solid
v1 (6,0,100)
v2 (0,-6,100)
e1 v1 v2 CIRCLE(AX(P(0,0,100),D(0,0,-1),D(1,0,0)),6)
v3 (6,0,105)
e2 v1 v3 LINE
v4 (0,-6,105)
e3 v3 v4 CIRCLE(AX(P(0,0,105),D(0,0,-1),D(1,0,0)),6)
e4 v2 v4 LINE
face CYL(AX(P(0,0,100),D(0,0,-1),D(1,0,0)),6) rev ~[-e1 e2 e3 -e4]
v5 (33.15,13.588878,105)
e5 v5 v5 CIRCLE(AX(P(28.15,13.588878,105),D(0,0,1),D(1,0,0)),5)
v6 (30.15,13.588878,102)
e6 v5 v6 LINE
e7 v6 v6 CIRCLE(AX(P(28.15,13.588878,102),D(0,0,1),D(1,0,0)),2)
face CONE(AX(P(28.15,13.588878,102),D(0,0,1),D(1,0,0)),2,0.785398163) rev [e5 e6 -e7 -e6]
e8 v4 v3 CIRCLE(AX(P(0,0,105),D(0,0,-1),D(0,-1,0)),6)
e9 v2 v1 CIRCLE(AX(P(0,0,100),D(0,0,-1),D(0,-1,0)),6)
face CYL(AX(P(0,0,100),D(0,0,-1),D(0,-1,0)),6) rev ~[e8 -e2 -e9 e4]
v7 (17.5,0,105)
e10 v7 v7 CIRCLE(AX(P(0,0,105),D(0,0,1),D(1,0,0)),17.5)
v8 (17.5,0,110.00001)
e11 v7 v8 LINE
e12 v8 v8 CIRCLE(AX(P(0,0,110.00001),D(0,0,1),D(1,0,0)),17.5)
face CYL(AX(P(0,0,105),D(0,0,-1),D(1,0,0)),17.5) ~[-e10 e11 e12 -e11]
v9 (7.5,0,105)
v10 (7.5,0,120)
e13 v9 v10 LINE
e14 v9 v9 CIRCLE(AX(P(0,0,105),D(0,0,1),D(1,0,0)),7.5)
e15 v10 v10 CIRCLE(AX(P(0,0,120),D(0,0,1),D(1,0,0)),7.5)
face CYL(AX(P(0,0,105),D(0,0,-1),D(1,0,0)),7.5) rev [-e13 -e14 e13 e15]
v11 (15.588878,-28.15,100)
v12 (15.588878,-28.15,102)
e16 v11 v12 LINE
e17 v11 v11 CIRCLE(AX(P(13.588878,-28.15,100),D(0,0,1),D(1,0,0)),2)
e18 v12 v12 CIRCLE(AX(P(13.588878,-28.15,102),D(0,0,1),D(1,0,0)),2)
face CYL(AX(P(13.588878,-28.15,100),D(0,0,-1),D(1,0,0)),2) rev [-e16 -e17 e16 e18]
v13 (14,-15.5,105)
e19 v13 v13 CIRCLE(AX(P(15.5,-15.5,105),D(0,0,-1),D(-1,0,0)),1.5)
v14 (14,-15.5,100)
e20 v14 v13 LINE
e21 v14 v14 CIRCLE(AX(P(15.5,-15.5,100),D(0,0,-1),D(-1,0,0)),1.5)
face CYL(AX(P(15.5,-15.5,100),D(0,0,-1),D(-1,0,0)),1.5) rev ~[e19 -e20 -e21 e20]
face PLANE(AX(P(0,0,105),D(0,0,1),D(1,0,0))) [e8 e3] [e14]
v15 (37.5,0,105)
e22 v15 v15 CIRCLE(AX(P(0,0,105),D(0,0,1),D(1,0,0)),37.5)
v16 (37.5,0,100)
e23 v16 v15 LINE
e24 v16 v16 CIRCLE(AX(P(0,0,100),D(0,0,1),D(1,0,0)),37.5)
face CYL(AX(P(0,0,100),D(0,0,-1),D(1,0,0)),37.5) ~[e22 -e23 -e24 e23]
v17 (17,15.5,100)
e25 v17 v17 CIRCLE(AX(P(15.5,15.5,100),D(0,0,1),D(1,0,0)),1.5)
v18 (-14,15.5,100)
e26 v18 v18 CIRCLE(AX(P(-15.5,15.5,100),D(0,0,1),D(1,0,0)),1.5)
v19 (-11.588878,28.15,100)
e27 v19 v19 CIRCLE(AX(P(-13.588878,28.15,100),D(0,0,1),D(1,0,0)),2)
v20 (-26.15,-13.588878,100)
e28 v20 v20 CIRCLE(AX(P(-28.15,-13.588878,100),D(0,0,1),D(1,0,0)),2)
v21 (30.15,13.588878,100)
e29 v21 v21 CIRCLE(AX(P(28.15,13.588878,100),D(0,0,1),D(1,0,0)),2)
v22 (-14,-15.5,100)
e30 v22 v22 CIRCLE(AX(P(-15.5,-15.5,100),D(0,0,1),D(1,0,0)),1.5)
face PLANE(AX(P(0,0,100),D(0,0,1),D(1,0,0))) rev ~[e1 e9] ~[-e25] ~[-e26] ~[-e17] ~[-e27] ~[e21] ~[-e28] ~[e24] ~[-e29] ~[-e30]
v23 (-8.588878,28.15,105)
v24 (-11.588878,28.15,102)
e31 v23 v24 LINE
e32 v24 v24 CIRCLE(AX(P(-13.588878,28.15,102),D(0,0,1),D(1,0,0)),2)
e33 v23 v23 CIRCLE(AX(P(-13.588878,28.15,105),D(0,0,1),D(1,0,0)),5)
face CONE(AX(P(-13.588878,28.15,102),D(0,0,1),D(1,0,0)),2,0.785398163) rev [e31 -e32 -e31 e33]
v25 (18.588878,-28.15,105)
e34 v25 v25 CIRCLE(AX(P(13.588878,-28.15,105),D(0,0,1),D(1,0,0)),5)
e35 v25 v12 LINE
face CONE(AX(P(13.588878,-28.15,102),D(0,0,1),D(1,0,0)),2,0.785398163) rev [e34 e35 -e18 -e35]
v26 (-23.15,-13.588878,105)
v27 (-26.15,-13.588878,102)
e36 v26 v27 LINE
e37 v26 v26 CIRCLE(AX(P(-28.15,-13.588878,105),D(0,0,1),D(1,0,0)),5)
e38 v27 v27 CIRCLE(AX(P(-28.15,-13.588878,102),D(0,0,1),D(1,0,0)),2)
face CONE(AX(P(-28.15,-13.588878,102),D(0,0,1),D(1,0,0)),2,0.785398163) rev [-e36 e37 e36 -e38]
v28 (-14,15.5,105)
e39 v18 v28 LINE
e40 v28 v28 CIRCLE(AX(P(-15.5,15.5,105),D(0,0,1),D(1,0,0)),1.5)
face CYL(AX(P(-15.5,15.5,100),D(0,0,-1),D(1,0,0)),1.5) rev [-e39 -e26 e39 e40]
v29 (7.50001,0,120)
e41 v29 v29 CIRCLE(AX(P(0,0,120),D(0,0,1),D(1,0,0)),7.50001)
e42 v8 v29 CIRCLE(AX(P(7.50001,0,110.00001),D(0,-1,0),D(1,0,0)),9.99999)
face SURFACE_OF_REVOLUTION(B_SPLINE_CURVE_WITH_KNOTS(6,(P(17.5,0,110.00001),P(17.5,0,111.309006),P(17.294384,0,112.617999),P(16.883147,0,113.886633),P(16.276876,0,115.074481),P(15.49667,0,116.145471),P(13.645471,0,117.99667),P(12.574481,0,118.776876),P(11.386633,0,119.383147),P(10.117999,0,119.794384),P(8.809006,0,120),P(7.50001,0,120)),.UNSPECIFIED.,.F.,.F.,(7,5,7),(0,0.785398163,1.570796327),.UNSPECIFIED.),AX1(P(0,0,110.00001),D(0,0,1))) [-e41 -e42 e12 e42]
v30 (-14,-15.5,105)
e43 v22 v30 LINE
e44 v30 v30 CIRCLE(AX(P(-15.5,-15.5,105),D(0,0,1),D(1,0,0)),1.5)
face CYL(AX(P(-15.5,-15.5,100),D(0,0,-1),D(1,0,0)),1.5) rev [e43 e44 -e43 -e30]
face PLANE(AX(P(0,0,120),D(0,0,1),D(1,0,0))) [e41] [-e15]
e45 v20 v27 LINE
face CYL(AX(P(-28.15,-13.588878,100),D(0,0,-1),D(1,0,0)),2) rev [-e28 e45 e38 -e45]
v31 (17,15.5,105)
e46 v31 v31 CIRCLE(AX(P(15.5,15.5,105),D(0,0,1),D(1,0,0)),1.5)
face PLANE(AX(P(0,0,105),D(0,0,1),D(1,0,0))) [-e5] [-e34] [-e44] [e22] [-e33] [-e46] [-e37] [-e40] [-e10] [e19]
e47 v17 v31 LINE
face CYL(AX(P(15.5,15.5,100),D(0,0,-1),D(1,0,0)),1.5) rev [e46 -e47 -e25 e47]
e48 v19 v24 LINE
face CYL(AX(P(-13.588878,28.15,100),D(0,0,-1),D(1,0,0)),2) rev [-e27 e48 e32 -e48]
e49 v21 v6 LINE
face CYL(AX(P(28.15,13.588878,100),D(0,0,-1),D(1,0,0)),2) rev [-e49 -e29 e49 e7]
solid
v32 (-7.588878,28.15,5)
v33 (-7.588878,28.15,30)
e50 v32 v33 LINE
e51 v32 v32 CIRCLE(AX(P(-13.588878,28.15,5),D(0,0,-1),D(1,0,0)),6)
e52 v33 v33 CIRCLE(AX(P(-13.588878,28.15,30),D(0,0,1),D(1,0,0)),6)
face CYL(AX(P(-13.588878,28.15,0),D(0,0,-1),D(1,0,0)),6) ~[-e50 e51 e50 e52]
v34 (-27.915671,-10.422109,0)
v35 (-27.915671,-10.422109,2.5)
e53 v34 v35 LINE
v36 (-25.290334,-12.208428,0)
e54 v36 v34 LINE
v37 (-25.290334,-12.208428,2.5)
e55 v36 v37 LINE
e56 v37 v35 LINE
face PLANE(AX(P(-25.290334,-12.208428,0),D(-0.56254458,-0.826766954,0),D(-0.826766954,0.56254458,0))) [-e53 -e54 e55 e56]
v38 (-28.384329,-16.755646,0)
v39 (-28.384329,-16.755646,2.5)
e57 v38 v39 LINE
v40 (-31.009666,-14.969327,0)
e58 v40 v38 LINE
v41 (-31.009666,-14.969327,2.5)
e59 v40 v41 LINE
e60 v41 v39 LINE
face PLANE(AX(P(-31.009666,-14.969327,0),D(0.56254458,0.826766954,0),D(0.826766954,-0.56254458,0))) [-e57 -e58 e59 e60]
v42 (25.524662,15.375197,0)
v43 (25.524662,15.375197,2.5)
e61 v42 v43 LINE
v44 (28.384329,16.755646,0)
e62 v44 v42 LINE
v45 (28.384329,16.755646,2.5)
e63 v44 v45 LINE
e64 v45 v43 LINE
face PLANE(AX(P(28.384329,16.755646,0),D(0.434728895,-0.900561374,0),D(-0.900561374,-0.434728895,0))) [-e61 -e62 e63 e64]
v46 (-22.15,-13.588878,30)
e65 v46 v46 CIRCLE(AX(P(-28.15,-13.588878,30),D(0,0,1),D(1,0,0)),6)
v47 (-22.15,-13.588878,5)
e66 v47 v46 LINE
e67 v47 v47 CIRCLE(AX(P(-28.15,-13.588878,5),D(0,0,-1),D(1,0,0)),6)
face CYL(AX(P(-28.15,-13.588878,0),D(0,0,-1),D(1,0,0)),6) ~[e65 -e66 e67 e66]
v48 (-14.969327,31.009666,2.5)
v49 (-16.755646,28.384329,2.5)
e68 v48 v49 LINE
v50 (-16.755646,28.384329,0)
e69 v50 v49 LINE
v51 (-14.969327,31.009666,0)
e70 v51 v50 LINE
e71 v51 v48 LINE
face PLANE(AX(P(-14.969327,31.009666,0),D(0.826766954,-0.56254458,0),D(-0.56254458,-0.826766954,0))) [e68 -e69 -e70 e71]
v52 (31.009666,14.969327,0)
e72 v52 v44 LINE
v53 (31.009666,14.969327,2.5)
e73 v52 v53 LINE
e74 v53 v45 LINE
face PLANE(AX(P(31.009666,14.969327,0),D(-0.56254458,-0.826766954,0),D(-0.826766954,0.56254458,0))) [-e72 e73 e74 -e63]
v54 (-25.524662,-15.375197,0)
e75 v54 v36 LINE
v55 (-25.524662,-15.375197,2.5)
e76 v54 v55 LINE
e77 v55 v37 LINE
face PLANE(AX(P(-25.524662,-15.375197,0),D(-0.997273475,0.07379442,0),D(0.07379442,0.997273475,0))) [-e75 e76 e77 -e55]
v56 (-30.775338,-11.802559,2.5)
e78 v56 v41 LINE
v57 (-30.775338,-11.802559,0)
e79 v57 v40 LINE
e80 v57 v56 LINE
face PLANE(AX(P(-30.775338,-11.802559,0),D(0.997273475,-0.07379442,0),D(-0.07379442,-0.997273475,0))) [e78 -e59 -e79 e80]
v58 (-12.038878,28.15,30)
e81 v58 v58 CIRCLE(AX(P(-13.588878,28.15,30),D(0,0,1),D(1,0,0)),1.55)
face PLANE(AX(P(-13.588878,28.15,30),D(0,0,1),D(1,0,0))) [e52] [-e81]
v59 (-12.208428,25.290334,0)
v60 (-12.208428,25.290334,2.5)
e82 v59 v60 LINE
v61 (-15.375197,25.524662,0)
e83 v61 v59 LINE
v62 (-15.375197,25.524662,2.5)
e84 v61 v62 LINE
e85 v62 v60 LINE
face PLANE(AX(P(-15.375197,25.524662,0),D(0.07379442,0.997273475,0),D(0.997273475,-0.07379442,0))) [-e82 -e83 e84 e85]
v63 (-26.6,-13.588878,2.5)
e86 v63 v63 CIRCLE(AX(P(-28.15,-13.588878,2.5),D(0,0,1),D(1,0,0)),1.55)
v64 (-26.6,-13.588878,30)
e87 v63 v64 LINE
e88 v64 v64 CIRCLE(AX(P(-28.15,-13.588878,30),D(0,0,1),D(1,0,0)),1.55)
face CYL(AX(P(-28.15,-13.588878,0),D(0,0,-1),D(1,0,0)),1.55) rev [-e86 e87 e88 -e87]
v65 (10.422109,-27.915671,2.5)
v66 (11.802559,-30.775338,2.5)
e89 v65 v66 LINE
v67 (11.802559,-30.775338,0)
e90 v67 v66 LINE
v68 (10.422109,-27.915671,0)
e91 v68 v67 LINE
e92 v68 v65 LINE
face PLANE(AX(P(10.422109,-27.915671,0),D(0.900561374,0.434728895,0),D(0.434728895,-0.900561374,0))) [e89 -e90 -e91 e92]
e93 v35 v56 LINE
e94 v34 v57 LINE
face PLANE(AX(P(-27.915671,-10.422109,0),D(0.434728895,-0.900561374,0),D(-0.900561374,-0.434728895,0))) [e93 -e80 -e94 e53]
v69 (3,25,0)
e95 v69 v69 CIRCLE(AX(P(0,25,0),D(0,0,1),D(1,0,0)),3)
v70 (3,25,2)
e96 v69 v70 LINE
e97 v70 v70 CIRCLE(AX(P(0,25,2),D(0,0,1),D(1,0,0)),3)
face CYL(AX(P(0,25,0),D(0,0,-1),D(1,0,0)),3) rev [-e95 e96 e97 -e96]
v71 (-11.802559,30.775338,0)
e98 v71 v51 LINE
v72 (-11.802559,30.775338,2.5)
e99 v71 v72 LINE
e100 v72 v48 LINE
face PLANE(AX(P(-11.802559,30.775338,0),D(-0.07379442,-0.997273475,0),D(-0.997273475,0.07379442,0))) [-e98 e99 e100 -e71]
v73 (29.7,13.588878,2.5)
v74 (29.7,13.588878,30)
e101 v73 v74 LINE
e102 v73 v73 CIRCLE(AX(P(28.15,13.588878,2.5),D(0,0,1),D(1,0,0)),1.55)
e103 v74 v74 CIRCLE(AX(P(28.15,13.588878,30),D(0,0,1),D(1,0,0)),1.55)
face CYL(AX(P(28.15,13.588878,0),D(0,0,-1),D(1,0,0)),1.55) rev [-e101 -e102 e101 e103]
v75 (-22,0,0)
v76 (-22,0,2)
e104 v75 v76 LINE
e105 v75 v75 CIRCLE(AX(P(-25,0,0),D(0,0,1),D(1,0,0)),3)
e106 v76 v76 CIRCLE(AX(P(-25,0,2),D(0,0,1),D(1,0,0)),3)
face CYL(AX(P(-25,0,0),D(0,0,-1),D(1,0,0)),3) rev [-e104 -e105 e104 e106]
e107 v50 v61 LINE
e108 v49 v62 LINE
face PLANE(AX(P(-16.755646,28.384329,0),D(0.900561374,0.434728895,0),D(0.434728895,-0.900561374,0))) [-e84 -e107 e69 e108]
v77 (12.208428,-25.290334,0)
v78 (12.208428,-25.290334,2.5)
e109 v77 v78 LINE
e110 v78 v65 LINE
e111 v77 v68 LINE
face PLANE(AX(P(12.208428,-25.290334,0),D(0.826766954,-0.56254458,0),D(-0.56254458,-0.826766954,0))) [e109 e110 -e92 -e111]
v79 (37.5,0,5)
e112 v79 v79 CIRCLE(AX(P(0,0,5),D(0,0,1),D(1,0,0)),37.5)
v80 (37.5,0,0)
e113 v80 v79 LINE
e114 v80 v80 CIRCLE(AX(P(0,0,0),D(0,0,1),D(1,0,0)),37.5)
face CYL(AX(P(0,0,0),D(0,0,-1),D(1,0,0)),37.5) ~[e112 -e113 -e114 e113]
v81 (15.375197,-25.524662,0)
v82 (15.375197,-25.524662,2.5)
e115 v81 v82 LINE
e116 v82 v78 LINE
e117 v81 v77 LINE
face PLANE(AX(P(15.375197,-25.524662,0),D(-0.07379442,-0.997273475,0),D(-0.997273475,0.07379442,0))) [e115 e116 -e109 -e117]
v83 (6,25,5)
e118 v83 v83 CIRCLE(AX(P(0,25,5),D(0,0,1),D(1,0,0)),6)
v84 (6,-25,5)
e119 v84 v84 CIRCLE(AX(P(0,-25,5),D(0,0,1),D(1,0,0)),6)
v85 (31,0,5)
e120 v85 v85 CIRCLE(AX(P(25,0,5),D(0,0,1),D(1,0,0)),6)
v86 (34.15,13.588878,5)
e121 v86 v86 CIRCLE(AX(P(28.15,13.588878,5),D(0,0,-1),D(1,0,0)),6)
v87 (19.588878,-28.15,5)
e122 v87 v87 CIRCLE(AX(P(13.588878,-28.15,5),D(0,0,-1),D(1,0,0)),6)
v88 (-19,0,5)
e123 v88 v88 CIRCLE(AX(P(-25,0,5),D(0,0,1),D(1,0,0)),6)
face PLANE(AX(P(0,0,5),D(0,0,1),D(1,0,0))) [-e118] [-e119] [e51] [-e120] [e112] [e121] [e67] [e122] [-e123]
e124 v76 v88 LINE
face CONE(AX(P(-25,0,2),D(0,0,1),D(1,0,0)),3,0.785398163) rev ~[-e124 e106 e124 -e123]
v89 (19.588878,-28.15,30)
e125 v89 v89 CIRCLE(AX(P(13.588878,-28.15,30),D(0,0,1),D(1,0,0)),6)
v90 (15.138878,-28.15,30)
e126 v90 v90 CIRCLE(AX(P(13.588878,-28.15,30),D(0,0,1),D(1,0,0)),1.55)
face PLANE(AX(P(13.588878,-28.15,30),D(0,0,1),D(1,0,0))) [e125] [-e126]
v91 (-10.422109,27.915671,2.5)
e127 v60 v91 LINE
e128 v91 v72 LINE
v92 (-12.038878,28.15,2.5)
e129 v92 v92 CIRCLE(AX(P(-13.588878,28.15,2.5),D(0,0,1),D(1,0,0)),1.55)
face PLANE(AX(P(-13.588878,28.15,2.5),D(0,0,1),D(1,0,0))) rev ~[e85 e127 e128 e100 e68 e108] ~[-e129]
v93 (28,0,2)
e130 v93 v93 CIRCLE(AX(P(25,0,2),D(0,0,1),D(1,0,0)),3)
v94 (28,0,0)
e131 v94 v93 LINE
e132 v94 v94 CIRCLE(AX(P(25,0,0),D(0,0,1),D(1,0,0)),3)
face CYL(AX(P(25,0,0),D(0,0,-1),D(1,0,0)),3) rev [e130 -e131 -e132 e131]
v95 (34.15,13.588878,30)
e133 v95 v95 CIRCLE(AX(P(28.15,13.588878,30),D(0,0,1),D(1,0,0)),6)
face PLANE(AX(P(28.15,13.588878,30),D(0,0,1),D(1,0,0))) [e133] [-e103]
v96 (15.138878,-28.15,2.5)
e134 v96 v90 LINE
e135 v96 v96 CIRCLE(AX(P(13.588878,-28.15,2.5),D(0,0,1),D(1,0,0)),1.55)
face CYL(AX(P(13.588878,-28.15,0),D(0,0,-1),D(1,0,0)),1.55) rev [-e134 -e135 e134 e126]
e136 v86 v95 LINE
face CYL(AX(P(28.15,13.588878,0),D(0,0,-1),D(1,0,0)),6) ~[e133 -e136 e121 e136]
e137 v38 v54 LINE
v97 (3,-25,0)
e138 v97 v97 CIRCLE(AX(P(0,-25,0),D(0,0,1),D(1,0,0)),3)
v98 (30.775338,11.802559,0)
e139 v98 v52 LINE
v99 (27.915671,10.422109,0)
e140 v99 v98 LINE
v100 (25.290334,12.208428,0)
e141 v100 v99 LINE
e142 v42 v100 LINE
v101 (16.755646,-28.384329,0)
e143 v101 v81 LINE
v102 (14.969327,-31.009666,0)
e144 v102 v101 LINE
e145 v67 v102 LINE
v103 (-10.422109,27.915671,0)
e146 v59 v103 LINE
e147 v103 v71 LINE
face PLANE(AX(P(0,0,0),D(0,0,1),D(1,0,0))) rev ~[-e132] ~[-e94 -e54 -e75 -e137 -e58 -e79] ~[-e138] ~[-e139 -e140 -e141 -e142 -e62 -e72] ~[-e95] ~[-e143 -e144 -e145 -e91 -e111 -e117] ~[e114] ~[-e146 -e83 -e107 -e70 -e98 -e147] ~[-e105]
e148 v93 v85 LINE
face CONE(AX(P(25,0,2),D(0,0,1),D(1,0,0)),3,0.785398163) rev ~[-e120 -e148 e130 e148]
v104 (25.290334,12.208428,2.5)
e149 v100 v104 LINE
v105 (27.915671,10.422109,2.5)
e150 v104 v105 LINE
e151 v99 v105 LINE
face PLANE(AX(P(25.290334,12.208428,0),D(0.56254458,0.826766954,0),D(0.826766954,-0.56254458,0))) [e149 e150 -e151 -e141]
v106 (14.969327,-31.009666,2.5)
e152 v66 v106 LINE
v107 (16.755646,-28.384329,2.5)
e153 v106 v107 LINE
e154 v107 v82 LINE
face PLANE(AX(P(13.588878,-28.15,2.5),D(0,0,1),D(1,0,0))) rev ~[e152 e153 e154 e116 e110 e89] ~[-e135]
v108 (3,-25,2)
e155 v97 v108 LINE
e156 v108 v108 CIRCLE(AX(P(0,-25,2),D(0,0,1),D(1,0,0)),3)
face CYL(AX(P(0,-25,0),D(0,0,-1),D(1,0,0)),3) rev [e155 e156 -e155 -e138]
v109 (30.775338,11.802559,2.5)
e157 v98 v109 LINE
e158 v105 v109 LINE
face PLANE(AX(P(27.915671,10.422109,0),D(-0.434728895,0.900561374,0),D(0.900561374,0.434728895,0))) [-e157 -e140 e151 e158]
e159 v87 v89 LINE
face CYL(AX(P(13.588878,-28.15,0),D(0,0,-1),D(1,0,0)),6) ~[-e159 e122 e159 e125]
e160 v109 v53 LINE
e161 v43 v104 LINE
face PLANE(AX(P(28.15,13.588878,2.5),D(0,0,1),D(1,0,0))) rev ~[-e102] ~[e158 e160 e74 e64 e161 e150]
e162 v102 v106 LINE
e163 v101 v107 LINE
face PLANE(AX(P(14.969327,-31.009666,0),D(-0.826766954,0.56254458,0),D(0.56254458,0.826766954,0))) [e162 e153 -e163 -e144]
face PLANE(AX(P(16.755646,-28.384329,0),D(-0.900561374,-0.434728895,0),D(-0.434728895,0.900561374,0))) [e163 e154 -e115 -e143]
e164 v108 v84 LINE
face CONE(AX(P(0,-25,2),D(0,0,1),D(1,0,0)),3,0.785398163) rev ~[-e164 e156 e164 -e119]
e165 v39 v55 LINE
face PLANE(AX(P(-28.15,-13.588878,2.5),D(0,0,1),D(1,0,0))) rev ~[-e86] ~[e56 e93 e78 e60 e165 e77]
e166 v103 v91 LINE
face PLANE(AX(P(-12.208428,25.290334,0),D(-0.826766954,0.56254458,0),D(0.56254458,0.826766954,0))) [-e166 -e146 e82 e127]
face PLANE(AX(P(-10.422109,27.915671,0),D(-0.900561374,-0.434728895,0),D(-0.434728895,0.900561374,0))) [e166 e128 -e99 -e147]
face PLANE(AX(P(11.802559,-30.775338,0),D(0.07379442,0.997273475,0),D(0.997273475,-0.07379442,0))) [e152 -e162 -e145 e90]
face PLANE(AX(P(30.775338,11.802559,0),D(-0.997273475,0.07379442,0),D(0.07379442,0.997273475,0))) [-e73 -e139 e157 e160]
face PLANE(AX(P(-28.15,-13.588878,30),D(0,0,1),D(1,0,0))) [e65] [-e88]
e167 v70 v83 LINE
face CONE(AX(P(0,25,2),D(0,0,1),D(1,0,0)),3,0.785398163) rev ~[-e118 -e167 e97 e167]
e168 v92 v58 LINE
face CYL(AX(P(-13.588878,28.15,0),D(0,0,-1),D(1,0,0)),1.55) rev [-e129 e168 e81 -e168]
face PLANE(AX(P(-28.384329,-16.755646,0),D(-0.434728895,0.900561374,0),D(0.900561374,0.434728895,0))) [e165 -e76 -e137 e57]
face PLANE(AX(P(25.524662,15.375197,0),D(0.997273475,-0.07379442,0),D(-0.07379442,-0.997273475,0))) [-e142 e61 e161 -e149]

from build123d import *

# Parameters (mm, degrees)
F0_R      = 37.5
F0_R_2    = 6
F0_R_3    = 3
F0_R_4    = 1.55
F1_DEPTH  = 5
F2_SIZE   = 3
F4_R      = 37.5
F4_R_2    = 2
F4_R_3    = 1.5
F5_DEPTH  = 5
F6_DEPTH  = 5
F7_DEPTH  = 30
F8_DEPTH  = 2.5
F9_SIZE   = 3
F10_R     = 17.5
F10_R_2   = 7.5
F11_DEPTH = 15
F12_R     = 9.99999


# Not quite as in the source:
# - a fillet or chamfer is up to 0.001 mm smaller than in the source, because OpenCascade refuses the exact size


with BuildPart() as f1:
    # F0 (on Top) → F1 (new body)
    with BuildSketch(Plane.XY):
        Circle(F0_R)
        with Locations((-28.15, -13.5888777375)):
            Circle(F0_R_2, mode=Mode.SUBTRACT)
        with Locations((13.5888777375, -28.15)):
            Circle(F0_R_2, mode=Mode.SUBTRACT)
        with Locations((0, -25)):
            Circle(F0_R_3, mode=Mode.SUBTRACT)
        with Locations((-25, 0)):
            Circle(F0_R_3, mode=Mode.SUBTRACT)
        with Locations((-13.5888777375, 28.15)):
            Circle(F0_R_2, mode=Mode.SUBTRACT)
        with Locations((25, 0)):
            Circle(F0_R_3, mode=Mode.SUBTRACT)
        with Locations((28.15, 13.5888777375)):
            Circle(F0_R_2, mode=Mode.SUBTRACT)
        with Locations((0, 25)):
            Circle(F0_R_3, mode=Mode.SUBTRACT)
        with Locations((28.15, 13.5888777375)):
            Circle(F0_R_2)
        Polygon((31.0096664331, 14.9693273833), (30.7753376785, 11.802558783), (27.9156712454, 10.4221091372), (25.2903335669, 12.2084280917), (25.5246623215, 15.375196692), (28.3843287546, 16.7556463378), align=None, mode=Mode.SUBTRACT)
        with Locations((-28.15, -13.5888777375)):
            Circle(F0_R_2)
        Polygon((-25.5246623215, -15.375196692), (-28.3843287546, -16.7556463378), (-31.0096664331, -14.9693273833), (-30.7753376785, -11.802558783), (-27.9156712454, -10.4221091372), (-25.2903335669, -12.2084280917), align=None, mode=Mode.SUBTRACT)
        with Locations((-13.5888777375, 28.15)):
            Circle(F0_R_2)
        Polygon((-15.375196692, 25.5246623215), (-16.7556463378, 28.3843287546), (-14.9693273833, 31.0096664331), (-11.802558783, 30.7753376785), (-10.4221091372, 27.9156712454), (-12.2084280917, 25.2903335669), align=None, mode=Mode.SUBTRACT)
        with Locations((13.5888777375, -28.15)):
            Circle(F0_R_2)
        Polygon((15.375196692, -25.5246623215), (16.7556463378, -28.3843287546), (14.9693273833, -31.0096664331), (11.802558783, -30.7753376785), (10.4221091372, -27.9156712454), (12.2084280917, -25.2903335669), align=None, mode=Mode.SUBTRACT)
        Polygon((-14.9693273833, 31.0096664331), (-16.7556463378, 28.3843287546), (-15.375196692, 25.5246623215), (-12.2084280917, 25.2903335669), (-10.4221091372, 27.9156712454), (-11.802558783, 30.7753376785), align=None)
        with Locations((-13.5888777375, 28.15)):
            Circle(F0_R_4, mode=Mode.SUBTRACT)
        Polygon((14.9693273833, -31.0096664331), (16.7556463378, -28.3843287546), (15.375196692, -25.5246623215), (12.2084280917, -25.2903335669), (10.4221091372, -27.9156712454), (11.802558783, -30.7753376785), align=None)
        with Locations((13.5888777375, -28.15)):
            Circle(F0_R_4, mode=Mode.SUBTRACT)
        Polygon((-31.0096664331, -14.9693273833), (-28.3843287546, -16.7556463378), (-25.5246623215, -15.375196692), (-25.2903335669, -12.2084280917), (-27.9156712454, -10.4221091372), (-30.7753376785, -11.802558783), align=None)
        with Locations((-28.15, -13.5888777375)):
            Circle(F0_R_4, mode=Mode.SUBTRACT)
        Polygon((27.9156712454, 10.4221091372), (30.7753376785, 11.802558783), (31.0096664331, 14.9693273833), (28.3843287546, 16.7556463378), (25.5246623215, 15.375196692), (25.2903335669, 12.2084280917), align=None)
        with Locations((28.15, 13.5888777375)):
            Circle(F0_R_4, mode=Mode.SUBTRACT)
    extrude(amount=F1_DEPTH)

    # F2
    f2_edges = [f1.edges().sort_by_distance(p)[0] for p in [
        (-3, 25, 5),
        (22, 0, 5),
        (-3, -25, 5),
        (-28, 0, 5),
    ]]
    chamfer(f2_edges, length=F2_SIZE)

    # F0 (on Top) → F7 (join)
    with BuildSketch(Plane.XY):
        with Locations((28.15, 13.5888777375)):
            Circle(F0_R_2)
        Polygon((31.0096664331, 14.9693273833), (30.7753376785, 11.802558783), (27.9156712454, 10.4221091372), (25.2903335669, 12.2084280917), (25.5246623215, 15.375196692), (28.3843287546, 16.7556463378), align=None, mode=Mode.SUBTRACT)
        Polygon((27.9156712454, 10.4221091372), (30.7753376785, 11.802558783), (31.0096664331, 14.9693273833), (28.3843287546, 16.7556463378), (25.5246623215, 15.375196692), (25.2903335669, 12.2084280917), align=None)
        with Locations((28.15, 13.5888777375)):
            Circle(F0_R_4, mode=Mode.SUBTRACT)
        with Locations((-13.5888777375, 28.15)):
            Circle(F0_R_2)
        Polygon((-15.375196692, 25.5246623215), (-16.7556463378, 28.3843287546), (-14.9693273833, 31.0096664331), (-11.802558783, 30.7753376785), (-10.4221091372, 27.9156712454), (-12.2084280917, 25.2903335669), align=None, mode=Mode.SUBTRACT)
        Polygon((-14.9693273833, 31.0096664331), (-16.7556463378, 28.3843287546), (-15.375196692, 25.5246623215), (-12.2084280917, 25.2903335669), (-10.4221091372, 27.9156712454), (-11.802558783, 30.7753376785), align=None)
        with Locations((-13.5888777375, 28.15)):
            Circle(F0_R_4, mode=Mode.SUBTRACT)
        with Locations((-28.15, -13.5888777375)):
            Circle(F0_R_2)
        Polygon((-25.5246623215, -15.375196692), (-28.3843287546, -16.7556463378), (-31.0096664331, -14.9693273833), (-30.7753376785, -11.802558783), (-27.9156712454, -10.4221091372), (-25.2903335669, -12.2084280917), align=None, mode=Mode.SUBTRACT)
        Polygon((-31.0096664331, -14.9693273833), (-28.3843287546, -16.7556463378), (-25.5246623215, -15.375196692), (-25.2903335669, -12.2084280917), (-27.9156712454, -10.4221091372), (-30.7753376785, -11.802558783), align=None)
        with Locations((-28.15, -13.5888777375)):
            Circle(F0_R_4, mode=Mode.SUBTRACT)
        with Locations((13.5888777375, -28.15)):
            Circle(F0_R_2)
        Polygon((15.375196692, -25.5246623215), (16.7556463378, -28.3843287546), (14.9693273833, -31.0096664331), (11.802558783, -30.7753376785), (10.4221091372, -27.9156712454), (12.2084280917, -25.2903335669), align=None, mode=Mode.SUBTRACT)
        Polygon((14.9693273833, -31.0096664331), (16.7556463378, -28.3843287546), (15.375196692, -25.5246623215), (12.2084280917, -25.2903335669), (10.4221091372, -27.9156712454), (11.802558783, -30.7753376785), align=None)
        with Locations((13.5888777375, -28.15)):
            Circle(F0_R_4, mode=Mode.SUBTRACT)
    extrude(amount=F7_DEPTH)

    # F0 (on Top) → F8 (cut)
    with BuildSketch(Plane.XY):
        Polygon((-31.0096664331, -14.9693273833), (-28.3843287546, -16.7556463378), (-25.5246623215, -15.375196692), (-25.2903335669, -12.2084280917), (-27.9156712454, -10.4221091372), (-30.7753376785, -11.802558783), align=None)
        with Locations((-28.15, -13.5888777375)):
            Circle(F0_R_4, mode=Mode.SUBTRACT)
        Polygon((-14.9693273833, 31.0096664331), (-16.7556463378, 28.3843287546), (-15.375196692, 25.5246623215), (-12.2084280917, 25.2903335669), (-10.4221091372, 27.9156712454), (-11.802558783, 30.7753376785), align=None)
        with Locations((-13.5888777375, 28.15)):
            Circle(F0_R_4, mode=Mode.SUBTRACT)
        Polygon((27.9156712454, 10.4221091372), (30.7753376785, 11.802558783), (31.0096664331, 14.9693273833), (28.3843287546, 16.7556463378), (25.5246623215, 15.375196692), (25.2903335669, 12.2084280917), align=None)
        with Locations((28.15, 13.5888777375)):
            Circle(F0_R_4, mode=Mode.SUBTRACT)
        Polygon((14.9693273833, -31.0096664331), (16.7556463378, -28.3843287546), (15.375196692, -25.5246623215), (12.2084280917, -25.2903335669), (10.4221091372, -27.9156712454), (11.802558783, -30.7753376785), align=None)
        with Locations((13.5888777375, -28.15)):
            Circle(F0_R_4, mode=Mode.SUBTRACT)
    extrude(amount=F8_DEPTH, mode=Mode.SUBTRACT)


with BuildPart() as f5:
    # F4 (on offset) → F5 (new body)
    with BuildSketch(Plane.XY.offset(100)):
        Circle(F4_R)
        with Locations((-28.15, -13.5888777375)):
            Circle(F4_R_2, mode=Mode.SUBTRACT)
        with Locations((-15.5, -15.5)):
            Circle(F4_R_3, mode=Mode.SUBTRACT)
        with Locations((13.5888777375, -28.15)):
            Circle(F4_R_2, mode=Mode.SUBTRACT)
        with BuildLine():
            ThreePointArc((17, -15.5), (15.5, -17), (14, -15.5))
            ThreePointArc((14, -15.5), (15.5, -14), (17, -15.5))
        make_face(mode=Mode.SUBTRACT)
        with Locations((-15.5, 15.5)):
            Circle(F4_R_3, mode=Mode.SUBTRACT)
        with Locations((-13.5888777375, 28.15)):
            Circle(F4_R_2, mode=Mode.SUBTRACT)
        with BuildLine():
            ThreePointArc((6, 0), (4.2426406871, -4.2426406871), (0, -6))
            ThreePointArc((0, -6), (-4.2426406871, 4.2426406871), (6, 0))
        make_face(mode=Mode.SUBTRACT)
        with Locations((15.5, 15.5)):
            Circle(F4_R_3, mode=Mode.SUBTRACT)
        with Locations((28.15, 13.5888777375)):
            Circle(F4_R_2, mode=Mode.SUBTRACT)
    extrude(amount=F5_DEPTH)

    # F4 (on offset) → F6 (join)
    with BuildSketch(Plane.XY.offset(100)):
        Circle(F4_R)
        with Locations((-28.15, -13.5888777375)):
            Circle(F4_R_2, mode=Mode.SUBTRACT)
        with Locations((-15.5, -15.5)):
            Circle(F4_R_3, mode=Mode.SUBTRACT)
        with Locations((13.5888777375, -28.15)):
            Circle(F4_R_2, mode=Mode.SUBTRACT)
        with BuildLine():
            ThreePointArc((17, -15.5), (15.5, -17), (14, -15.5))
            ThreePointArc((14, -15.5), (15.5, -14), (17, -15.5))
        make_face(mode=Mode.SUBTRACT)
        with Locations((-15.5, 15.5)):
            Circle(F4_R_3, mode=Mode.SUBTRACT)
        with Locations((-13.5888777375, 28.15)):
            Circle(F4_R_2, mode=Mode.SUBTRACT)
        with BuildLine():
            ThreePointArc((6, 0), (4.2426406871, -4.2426406871), (0, -6))
            ThreePointArc((0, -6), (-4.2426406871, 4.2426406871), (6, 0))
        make_face(mode=Mode.SUBTRACT)
        with Locations((15.5, 15.5)):
            Circle(F4_R_3, mode=Mode.SUBTRACT)
        with Locations((28.15, 13.5888777375)):
            Circle(F4_R_2, mode=Mode.SUBTRACT)
    extrude(amount=F6_DEPTH)

    # F9
    f9_edges = [f5.edges().sort_by_distance(p)[0] for p in [
        (-30.15, -13.588878, 105),
        (-15.588878, 28.15, 105),
        (26.15, 13.588878, 105),
        (11.588878, -28.15, 105),
    ]]
    chamfer(f9_edges, length=F9_SIZE)

    # F10 (on face) → F11 (join)
    with BuildSketch(Plane.XY.offset(105)):
        Circle(F10_R)
        Circle(F10_R_2, mode=Mode.SUBTRACT)
    extrude(amount=F11_DEPTH)

    # F12 (radius 10 in the source; OpenCascade refuses exactly that, so slightly less here)
    f12_edges = [f5.edges().sort_by_distance(p)[0] for p in [
        (-17.5, 0, 120),
    ]]
    fillet(f12_edges, radius=F12_R)


solid = Compound([f1.part, f5.part])
